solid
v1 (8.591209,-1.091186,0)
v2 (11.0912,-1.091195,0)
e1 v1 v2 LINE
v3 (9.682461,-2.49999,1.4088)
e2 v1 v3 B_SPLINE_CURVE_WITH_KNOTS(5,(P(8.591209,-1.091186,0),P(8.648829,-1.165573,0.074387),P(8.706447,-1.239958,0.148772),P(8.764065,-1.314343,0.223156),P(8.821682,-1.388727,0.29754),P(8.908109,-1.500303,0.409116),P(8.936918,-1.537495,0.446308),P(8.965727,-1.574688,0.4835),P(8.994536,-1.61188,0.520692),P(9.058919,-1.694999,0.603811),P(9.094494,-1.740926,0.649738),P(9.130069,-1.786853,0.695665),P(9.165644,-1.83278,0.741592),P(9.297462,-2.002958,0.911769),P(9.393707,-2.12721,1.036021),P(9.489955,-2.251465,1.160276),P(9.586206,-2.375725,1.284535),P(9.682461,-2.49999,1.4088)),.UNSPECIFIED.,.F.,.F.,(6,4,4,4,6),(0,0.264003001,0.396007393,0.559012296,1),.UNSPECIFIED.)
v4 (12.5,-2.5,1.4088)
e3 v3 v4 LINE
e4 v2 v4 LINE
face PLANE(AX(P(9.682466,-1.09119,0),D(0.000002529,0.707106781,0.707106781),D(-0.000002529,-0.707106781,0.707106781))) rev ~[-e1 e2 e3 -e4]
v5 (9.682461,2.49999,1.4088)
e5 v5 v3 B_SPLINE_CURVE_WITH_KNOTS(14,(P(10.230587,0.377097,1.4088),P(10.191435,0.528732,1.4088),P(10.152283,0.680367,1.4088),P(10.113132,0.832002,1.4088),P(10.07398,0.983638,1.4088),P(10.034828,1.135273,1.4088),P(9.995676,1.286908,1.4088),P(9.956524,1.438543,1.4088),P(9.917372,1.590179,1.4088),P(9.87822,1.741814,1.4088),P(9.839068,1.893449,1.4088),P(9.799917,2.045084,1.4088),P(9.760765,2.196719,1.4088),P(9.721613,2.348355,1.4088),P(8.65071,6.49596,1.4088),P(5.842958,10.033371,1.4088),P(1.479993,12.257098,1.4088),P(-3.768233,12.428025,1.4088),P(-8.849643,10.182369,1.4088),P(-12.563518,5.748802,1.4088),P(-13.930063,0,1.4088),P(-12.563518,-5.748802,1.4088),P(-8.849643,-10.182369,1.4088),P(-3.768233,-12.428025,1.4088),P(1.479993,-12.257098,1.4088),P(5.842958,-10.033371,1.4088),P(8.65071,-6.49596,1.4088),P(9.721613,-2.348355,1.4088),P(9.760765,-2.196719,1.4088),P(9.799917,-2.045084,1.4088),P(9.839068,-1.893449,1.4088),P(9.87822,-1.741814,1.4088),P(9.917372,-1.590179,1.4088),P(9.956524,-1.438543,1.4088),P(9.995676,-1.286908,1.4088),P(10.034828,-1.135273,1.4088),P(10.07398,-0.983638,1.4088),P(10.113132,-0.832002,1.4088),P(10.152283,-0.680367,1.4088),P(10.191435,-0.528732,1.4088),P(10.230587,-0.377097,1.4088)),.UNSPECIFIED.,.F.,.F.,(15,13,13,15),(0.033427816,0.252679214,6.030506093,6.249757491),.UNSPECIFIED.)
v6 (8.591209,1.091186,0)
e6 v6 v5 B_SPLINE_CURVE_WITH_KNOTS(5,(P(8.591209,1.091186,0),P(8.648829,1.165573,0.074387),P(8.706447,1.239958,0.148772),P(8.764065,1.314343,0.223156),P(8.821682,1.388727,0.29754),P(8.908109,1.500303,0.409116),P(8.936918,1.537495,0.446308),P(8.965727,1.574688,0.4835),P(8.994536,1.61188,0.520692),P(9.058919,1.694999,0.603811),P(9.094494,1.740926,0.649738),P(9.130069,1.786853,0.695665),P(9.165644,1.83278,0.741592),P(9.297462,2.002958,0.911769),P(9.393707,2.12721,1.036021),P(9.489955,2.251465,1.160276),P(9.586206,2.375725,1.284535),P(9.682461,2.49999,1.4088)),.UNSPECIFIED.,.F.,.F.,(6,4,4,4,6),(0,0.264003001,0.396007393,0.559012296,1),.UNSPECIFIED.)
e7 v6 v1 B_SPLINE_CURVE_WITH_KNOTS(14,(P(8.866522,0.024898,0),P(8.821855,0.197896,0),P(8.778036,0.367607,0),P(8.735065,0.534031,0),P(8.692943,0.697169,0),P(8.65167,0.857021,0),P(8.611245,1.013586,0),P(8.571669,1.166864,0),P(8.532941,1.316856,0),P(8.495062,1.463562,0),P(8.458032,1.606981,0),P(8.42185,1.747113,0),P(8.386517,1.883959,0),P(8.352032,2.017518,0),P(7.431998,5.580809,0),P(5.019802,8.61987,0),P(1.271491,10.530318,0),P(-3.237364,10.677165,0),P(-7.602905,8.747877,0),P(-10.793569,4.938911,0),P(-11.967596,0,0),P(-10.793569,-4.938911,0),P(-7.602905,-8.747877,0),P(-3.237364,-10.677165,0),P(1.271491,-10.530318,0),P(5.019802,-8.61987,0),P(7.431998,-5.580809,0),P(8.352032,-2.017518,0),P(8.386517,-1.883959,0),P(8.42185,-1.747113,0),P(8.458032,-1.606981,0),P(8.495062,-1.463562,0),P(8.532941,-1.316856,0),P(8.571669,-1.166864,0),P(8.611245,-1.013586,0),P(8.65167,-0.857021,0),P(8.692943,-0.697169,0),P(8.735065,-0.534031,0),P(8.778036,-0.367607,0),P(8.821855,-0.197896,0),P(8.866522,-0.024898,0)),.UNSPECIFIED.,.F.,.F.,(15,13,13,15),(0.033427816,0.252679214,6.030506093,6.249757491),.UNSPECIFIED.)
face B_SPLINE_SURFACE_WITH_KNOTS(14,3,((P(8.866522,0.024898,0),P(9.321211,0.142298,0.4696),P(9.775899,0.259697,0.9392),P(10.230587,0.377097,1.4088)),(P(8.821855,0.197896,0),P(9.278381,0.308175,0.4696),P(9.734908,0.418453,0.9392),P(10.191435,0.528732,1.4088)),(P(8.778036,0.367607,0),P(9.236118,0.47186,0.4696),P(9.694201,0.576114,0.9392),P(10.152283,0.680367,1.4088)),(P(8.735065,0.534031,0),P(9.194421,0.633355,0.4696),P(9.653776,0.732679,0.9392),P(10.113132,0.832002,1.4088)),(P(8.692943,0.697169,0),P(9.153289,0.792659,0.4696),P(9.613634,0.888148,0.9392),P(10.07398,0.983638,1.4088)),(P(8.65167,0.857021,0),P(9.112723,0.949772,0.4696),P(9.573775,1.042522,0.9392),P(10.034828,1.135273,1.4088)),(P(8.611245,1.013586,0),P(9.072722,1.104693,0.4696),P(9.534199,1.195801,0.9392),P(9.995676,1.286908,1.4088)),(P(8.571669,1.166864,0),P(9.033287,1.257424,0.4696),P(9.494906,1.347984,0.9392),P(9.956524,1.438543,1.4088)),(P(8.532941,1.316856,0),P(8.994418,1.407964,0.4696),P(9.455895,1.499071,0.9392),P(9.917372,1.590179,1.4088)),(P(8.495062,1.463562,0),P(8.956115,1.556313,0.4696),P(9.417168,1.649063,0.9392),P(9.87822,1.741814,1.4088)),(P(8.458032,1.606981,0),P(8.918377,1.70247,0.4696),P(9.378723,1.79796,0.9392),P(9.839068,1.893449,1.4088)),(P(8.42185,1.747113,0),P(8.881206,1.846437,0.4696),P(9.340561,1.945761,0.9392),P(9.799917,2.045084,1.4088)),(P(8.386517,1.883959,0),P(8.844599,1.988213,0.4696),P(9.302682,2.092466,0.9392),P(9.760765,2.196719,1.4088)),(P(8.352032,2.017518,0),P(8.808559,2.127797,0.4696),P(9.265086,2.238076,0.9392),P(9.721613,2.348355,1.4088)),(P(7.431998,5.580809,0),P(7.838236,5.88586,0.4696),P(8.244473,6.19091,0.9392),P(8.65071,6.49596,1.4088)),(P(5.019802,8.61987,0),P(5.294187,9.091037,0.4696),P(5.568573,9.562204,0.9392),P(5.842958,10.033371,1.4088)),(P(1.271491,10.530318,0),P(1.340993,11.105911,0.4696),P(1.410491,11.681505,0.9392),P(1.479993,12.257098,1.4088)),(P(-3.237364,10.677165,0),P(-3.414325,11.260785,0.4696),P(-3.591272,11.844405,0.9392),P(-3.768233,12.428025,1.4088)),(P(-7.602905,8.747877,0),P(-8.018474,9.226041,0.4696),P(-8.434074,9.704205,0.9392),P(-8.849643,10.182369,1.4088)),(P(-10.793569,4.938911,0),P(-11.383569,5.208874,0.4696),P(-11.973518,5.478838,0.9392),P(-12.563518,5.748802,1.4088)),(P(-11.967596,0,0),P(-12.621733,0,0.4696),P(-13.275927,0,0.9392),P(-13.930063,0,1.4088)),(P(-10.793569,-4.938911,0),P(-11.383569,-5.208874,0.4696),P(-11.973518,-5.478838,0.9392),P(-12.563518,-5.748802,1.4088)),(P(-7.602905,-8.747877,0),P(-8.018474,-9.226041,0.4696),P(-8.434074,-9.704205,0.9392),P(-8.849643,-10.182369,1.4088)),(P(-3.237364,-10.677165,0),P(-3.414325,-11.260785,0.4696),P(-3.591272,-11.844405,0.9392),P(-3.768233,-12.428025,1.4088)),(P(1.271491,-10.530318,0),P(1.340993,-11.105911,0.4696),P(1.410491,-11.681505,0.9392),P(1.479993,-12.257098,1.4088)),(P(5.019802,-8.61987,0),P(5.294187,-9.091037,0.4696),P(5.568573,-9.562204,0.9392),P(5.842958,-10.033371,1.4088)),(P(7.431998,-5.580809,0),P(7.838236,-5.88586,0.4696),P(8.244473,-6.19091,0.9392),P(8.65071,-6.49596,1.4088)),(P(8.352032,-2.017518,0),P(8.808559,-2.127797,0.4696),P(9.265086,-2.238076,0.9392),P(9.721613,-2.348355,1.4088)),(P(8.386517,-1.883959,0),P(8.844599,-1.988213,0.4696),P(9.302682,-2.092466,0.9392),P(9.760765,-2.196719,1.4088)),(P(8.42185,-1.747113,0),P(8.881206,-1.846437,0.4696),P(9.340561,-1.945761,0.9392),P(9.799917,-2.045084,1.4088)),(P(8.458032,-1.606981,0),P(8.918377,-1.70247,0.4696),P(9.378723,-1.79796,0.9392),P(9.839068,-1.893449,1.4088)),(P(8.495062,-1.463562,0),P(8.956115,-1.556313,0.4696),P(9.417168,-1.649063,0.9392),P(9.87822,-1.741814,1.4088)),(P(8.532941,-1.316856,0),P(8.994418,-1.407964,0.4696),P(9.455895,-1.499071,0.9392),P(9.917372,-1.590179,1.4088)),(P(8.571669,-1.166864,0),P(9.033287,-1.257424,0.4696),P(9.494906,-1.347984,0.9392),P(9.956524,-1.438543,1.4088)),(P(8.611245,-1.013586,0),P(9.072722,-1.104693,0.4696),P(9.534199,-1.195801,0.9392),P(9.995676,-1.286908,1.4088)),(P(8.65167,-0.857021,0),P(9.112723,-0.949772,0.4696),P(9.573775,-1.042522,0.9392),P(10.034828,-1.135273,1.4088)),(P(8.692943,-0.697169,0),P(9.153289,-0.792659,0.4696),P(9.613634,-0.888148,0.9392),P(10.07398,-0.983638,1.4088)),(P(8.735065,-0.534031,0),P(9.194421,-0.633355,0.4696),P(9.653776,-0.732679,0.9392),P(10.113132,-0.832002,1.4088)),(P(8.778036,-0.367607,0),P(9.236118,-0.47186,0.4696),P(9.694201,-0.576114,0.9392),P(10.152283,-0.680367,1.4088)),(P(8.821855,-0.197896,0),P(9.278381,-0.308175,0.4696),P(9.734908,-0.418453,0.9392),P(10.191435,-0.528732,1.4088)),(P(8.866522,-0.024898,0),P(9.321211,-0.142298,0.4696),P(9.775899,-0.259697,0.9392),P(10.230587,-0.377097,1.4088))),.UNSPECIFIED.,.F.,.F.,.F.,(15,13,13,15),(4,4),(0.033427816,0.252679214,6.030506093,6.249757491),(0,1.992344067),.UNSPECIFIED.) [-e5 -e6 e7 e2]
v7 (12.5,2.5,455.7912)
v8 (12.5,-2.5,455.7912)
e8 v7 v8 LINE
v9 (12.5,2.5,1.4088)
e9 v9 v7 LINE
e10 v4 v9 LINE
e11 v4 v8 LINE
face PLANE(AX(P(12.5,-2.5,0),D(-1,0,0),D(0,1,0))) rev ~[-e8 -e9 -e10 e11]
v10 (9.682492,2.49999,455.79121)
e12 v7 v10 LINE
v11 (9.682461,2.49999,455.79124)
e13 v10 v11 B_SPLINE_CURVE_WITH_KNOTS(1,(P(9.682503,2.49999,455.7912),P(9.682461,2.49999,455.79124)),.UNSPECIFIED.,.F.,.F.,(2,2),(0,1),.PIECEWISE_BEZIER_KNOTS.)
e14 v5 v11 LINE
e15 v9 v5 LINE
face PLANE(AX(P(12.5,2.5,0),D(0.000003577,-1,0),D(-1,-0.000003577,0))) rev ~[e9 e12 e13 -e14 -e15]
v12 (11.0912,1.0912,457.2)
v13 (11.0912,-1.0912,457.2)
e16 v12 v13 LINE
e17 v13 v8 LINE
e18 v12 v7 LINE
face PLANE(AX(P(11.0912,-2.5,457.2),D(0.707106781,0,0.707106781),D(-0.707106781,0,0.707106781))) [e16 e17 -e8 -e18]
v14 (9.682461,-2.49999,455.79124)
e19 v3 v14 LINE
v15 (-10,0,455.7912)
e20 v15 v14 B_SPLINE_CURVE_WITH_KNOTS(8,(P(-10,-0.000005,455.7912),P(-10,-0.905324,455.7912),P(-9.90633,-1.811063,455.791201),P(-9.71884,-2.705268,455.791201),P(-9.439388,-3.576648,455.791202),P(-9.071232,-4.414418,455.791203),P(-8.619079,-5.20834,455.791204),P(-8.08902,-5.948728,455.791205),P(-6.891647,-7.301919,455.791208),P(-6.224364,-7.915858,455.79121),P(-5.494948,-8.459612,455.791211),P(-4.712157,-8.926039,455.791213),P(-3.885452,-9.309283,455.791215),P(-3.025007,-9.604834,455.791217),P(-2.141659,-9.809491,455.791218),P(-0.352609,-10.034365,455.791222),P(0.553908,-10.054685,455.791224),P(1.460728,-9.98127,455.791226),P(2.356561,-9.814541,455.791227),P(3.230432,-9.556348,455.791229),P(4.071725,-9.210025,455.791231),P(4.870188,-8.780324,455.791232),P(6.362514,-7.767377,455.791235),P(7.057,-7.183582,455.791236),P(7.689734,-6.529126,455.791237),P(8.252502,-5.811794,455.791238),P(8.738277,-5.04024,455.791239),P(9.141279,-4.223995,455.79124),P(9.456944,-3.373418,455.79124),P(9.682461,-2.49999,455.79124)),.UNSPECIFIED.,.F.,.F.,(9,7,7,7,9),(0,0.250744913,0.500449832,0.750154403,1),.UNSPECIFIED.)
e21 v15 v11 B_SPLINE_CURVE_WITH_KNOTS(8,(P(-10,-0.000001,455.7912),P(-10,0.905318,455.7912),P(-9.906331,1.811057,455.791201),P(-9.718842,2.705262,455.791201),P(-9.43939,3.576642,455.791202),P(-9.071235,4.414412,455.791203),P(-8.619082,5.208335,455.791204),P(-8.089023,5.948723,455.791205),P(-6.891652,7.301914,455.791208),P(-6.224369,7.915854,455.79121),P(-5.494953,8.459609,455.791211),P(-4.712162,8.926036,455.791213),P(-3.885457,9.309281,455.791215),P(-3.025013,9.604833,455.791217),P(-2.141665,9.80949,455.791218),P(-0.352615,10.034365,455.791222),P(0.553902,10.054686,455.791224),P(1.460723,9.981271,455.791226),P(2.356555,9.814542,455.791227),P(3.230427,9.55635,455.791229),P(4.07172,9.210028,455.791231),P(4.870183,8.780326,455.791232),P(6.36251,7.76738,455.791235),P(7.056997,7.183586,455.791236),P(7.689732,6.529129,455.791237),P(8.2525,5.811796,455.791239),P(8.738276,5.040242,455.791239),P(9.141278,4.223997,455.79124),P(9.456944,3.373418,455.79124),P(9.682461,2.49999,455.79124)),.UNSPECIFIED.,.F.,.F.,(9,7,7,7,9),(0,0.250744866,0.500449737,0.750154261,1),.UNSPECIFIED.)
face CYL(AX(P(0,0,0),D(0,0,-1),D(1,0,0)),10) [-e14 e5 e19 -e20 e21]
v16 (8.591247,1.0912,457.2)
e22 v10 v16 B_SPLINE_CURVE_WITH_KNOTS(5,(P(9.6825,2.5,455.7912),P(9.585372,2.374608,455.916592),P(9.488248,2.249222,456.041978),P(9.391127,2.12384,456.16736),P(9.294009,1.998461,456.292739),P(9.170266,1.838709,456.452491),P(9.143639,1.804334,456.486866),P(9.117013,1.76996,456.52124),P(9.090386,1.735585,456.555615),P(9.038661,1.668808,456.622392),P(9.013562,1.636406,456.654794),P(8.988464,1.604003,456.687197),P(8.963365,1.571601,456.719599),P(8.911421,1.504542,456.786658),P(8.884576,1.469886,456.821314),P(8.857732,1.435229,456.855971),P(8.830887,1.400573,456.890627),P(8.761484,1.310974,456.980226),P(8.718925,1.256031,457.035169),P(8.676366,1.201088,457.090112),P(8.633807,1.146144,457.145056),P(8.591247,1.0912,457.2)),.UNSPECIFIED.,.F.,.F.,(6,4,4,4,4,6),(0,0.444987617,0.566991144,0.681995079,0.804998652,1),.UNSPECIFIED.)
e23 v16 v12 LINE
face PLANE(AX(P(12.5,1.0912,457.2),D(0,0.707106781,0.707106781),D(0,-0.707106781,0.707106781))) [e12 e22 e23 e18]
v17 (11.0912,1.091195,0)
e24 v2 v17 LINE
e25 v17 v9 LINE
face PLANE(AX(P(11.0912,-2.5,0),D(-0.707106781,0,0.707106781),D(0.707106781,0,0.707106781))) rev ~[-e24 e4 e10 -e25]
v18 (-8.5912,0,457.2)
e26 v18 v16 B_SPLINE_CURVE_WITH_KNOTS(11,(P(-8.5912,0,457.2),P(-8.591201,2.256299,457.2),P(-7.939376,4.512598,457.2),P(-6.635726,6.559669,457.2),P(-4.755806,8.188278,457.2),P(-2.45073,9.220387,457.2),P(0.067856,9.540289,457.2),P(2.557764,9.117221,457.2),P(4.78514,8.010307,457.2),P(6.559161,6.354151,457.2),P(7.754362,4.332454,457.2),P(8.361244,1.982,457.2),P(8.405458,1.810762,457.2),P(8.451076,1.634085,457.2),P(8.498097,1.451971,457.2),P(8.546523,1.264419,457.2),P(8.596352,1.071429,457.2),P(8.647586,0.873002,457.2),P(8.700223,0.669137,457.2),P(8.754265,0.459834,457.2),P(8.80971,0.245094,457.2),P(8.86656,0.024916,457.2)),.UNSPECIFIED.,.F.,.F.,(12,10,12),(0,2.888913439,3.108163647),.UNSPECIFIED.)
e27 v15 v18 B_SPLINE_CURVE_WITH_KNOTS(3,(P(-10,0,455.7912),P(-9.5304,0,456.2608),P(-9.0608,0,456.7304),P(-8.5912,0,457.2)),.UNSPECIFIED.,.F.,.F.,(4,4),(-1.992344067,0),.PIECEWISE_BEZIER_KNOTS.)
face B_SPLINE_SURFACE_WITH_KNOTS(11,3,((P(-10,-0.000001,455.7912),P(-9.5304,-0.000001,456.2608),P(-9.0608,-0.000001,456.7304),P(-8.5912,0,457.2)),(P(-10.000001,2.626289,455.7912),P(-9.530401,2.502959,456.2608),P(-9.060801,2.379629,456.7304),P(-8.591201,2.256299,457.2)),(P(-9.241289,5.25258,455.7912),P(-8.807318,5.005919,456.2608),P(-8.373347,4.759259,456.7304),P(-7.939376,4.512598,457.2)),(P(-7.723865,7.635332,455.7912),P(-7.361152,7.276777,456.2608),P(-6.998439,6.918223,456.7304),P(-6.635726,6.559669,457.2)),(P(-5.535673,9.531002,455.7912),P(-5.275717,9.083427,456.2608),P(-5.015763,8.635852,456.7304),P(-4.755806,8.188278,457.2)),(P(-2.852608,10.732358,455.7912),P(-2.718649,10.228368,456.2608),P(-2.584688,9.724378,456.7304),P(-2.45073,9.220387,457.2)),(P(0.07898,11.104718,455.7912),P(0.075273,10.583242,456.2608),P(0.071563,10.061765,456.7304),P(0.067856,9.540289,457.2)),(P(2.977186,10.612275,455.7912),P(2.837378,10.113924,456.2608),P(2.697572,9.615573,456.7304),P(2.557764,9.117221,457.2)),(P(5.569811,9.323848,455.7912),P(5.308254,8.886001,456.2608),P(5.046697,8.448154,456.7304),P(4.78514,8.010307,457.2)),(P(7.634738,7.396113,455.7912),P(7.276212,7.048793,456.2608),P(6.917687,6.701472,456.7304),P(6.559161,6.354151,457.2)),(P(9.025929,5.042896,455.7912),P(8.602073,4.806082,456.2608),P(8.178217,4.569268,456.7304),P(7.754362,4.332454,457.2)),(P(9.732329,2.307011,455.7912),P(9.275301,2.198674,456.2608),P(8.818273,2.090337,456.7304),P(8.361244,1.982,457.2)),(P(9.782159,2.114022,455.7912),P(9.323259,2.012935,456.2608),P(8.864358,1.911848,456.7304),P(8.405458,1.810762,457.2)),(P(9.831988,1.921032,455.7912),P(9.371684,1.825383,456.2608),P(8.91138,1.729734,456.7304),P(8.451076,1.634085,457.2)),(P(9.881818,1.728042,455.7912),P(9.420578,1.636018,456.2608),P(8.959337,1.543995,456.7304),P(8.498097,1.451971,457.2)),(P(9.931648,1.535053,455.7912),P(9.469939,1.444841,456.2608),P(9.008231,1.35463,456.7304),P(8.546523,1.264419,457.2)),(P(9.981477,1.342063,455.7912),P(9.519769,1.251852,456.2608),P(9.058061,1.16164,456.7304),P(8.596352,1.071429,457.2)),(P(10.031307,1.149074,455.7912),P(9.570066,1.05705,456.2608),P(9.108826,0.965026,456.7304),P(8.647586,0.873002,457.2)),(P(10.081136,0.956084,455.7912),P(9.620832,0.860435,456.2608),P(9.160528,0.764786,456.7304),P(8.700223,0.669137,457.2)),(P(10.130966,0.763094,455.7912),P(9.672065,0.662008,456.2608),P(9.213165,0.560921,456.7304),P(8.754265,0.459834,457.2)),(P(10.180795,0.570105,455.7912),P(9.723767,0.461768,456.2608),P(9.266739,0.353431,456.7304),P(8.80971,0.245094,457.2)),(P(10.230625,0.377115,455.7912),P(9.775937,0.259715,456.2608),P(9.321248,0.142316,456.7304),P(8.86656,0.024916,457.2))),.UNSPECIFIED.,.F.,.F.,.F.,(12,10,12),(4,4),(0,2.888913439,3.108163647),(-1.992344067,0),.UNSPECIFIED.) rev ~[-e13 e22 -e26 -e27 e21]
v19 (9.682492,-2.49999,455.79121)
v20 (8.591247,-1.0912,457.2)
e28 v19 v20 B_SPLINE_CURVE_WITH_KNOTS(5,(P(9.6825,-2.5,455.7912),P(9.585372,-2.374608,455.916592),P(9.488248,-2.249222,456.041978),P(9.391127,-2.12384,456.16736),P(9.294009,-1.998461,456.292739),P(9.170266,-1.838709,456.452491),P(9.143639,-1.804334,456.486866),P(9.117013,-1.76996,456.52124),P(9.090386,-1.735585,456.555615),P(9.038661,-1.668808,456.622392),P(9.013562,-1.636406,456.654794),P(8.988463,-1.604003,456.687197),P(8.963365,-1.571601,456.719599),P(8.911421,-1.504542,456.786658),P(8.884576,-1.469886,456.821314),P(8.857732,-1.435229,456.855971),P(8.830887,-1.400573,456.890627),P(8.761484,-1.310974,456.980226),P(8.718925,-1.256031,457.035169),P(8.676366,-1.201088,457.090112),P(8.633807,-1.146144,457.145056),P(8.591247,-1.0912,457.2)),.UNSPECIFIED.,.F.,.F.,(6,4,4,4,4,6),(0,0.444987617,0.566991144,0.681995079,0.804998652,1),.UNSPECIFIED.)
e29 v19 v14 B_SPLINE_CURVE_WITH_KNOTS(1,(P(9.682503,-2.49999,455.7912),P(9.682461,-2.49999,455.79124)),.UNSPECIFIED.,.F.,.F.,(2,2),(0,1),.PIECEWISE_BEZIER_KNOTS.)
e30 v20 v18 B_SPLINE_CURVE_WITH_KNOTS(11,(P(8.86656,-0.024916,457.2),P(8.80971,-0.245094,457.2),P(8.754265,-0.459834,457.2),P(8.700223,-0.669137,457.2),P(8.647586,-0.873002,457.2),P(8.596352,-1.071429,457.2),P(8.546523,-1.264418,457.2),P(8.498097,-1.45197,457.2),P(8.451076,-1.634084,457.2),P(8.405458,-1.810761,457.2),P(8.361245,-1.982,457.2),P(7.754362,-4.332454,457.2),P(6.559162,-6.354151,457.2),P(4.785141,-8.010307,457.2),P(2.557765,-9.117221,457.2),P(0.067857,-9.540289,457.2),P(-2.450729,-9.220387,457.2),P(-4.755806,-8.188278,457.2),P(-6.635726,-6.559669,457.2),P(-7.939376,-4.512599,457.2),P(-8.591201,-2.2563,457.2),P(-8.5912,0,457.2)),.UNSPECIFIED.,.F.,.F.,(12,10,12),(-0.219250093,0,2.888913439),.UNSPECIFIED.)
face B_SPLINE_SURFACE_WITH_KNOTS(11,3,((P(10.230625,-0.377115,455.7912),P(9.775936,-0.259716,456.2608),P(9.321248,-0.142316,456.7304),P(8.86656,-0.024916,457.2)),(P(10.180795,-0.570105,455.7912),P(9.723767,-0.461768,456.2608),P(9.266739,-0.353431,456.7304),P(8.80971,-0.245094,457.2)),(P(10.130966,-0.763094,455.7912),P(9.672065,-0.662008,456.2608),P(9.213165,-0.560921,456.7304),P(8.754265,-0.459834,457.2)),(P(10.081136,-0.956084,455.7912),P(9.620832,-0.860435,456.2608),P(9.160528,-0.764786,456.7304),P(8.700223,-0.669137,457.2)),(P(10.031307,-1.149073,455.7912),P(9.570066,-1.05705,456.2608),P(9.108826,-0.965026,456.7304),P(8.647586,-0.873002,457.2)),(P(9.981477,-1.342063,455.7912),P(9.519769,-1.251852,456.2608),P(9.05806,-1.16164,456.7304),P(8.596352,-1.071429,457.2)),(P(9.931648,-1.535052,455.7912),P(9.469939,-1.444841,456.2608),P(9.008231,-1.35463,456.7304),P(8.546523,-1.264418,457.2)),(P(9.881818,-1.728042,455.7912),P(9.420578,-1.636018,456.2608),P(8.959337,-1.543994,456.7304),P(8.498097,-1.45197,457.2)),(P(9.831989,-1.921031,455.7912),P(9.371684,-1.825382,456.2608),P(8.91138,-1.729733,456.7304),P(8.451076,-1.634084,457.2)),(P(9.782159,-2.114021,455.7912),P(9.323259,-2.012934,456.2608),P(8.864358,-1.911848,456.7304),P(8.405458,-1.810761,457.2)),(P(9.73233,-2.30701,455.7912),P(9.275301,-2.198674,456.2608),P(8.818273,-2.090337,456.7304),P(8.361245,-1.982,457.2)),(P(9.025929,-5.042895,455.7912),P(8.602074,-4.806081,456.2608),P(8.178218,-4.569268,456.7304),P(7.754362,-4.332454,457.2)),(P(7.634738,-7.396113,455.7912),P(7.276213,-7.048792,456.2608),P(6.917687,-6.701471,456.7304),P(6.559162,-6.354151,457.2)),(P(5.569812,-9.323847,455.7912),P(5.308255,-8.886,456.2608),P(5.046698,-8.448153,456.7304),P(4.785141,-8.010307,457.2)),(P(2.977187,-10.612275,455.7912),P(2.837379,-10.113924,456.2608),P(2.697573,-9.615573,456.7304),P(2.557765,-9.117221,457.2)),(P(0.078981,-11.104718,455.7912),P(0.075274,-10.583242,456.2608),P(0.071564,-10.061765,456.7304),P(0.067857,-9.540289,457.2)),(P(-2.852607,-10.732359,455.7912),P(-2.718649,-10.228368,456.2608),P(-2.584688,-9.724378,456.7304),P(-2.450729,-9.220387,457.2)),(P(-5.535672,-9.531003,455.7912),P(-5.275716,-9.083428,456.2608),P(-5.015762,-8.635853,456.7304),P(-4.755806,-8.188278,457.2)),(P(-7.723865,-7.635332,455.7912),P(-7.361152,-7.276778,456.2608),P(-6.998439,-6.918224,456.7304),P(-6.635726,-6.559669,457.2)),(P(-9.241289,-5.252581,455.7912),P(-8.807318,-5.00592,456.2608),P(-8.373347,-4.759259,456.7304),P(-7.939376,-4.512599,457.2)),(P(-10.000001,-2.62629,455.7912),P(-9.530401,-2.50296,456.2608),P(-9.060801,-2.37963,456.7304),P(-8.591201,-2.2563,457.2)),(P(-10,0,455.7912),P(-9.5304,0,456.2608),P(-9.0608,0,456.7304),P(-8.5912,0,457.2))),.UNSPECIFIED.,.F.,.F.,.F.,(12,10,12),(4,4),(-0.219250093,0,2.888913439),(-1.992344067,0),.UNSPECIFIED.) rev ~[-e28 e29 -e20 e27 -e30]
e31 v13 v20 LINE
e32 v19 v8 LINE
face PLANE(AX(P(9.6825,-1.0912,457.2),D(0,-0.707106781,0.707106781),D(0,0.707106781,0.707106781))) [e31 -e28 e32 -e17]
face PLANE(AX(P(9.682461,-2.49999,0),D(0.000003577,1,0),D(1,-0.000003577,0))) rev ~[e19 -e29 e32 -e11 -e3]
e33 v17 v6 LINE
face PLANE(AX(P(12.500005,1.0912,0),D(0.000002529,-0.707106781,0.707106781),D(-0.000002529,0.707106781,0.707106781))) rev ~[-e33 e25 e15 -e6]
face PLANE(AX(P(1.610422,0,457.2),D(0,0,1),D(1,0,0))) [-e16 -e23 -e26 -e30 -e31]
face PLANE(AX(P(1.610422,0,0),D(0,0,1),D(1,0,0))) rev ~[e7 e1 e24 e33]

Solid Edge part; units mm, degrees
sketch "Sketch1" plane through (0, 0, 0) normal (0, 0, 1) x (1, 0, 0)
  line L0 (12.5, 2.5) -> (9.6825, 2.5)
  line L1 (12.5, -2.5) -> (12.5, 2.5)
  line L2 (9.6825, -2.5) -> (12.5, -2.5)
  arc A0 (9.6825, -2.5) -> (9.6825, 2.5) centre (0, 0) cw
extrude "Protrusion1" add sketch "Sketch1" along normal blind 457.2
sketch "Sketch2" plane through (0, 0, 0) normal (0, 0, 1) x (1, 0, 0)
  line L0 (12.5, 2.5) -> (9.6825, 2.5)
  line L1 (12.5, -2.5) -> (12.5, 2.5)
  line L2 (9.6825, -2.5) -> (12.5, -2.5)
  arc A0 (9.6825, -2.5) -> (9.6825, 2.5) centre (0, 0) cw
sketch "Sketch3" plane through (0, 0, 0) normal (0, -1, 0) x (1, 0, 0)
  line L0 (11.0912, 0) -> (12.5, 1.4088)
  line L1 (12.5, 1.4088) -> (12.5, 0)
  line L2 (12.5, 0) -> (11.0912, 0)
sweep "SweptCutout_1" cut profiles "Sketch3" path "Sketch2"
sketch "Sketch4" plane through (0, 0, 0) normal (0, -1, 0) x (1, 0, 0)
  line L0 (12.5, 457.2) -> (12.5, 455.7912)
  line L1 (11.0912, 457.2) -> (12.5, 455.7912)
  line L2 (11.0912, 457.2) -> (12.5, 457.2)
sketch3d "SweptCutout_2 path"
  arc A0 (9.6825, -2.5, 457.2) -> (-10, 0, 457.2) centre (0, 0, 457.2)
  arc A1 (-10, 0, 457.2) -> (9.6825, 2.5, 457.2) centre (0, 0, 457.2)
  line L2 (9.6825, -2.5, 457.2) -> (12.5, -2.5, 457.2)
  line L3 (12.5, -2.5, 457.2) -> (12.5, 2.5, 457.2)
  line L4 (12.5, 2.5, 457.2) -> (9.6825, 2.5, 457.2)
sweep "SweptCutout_2" cut profiles "Sketch4" path "SweptCutout_2 path"
